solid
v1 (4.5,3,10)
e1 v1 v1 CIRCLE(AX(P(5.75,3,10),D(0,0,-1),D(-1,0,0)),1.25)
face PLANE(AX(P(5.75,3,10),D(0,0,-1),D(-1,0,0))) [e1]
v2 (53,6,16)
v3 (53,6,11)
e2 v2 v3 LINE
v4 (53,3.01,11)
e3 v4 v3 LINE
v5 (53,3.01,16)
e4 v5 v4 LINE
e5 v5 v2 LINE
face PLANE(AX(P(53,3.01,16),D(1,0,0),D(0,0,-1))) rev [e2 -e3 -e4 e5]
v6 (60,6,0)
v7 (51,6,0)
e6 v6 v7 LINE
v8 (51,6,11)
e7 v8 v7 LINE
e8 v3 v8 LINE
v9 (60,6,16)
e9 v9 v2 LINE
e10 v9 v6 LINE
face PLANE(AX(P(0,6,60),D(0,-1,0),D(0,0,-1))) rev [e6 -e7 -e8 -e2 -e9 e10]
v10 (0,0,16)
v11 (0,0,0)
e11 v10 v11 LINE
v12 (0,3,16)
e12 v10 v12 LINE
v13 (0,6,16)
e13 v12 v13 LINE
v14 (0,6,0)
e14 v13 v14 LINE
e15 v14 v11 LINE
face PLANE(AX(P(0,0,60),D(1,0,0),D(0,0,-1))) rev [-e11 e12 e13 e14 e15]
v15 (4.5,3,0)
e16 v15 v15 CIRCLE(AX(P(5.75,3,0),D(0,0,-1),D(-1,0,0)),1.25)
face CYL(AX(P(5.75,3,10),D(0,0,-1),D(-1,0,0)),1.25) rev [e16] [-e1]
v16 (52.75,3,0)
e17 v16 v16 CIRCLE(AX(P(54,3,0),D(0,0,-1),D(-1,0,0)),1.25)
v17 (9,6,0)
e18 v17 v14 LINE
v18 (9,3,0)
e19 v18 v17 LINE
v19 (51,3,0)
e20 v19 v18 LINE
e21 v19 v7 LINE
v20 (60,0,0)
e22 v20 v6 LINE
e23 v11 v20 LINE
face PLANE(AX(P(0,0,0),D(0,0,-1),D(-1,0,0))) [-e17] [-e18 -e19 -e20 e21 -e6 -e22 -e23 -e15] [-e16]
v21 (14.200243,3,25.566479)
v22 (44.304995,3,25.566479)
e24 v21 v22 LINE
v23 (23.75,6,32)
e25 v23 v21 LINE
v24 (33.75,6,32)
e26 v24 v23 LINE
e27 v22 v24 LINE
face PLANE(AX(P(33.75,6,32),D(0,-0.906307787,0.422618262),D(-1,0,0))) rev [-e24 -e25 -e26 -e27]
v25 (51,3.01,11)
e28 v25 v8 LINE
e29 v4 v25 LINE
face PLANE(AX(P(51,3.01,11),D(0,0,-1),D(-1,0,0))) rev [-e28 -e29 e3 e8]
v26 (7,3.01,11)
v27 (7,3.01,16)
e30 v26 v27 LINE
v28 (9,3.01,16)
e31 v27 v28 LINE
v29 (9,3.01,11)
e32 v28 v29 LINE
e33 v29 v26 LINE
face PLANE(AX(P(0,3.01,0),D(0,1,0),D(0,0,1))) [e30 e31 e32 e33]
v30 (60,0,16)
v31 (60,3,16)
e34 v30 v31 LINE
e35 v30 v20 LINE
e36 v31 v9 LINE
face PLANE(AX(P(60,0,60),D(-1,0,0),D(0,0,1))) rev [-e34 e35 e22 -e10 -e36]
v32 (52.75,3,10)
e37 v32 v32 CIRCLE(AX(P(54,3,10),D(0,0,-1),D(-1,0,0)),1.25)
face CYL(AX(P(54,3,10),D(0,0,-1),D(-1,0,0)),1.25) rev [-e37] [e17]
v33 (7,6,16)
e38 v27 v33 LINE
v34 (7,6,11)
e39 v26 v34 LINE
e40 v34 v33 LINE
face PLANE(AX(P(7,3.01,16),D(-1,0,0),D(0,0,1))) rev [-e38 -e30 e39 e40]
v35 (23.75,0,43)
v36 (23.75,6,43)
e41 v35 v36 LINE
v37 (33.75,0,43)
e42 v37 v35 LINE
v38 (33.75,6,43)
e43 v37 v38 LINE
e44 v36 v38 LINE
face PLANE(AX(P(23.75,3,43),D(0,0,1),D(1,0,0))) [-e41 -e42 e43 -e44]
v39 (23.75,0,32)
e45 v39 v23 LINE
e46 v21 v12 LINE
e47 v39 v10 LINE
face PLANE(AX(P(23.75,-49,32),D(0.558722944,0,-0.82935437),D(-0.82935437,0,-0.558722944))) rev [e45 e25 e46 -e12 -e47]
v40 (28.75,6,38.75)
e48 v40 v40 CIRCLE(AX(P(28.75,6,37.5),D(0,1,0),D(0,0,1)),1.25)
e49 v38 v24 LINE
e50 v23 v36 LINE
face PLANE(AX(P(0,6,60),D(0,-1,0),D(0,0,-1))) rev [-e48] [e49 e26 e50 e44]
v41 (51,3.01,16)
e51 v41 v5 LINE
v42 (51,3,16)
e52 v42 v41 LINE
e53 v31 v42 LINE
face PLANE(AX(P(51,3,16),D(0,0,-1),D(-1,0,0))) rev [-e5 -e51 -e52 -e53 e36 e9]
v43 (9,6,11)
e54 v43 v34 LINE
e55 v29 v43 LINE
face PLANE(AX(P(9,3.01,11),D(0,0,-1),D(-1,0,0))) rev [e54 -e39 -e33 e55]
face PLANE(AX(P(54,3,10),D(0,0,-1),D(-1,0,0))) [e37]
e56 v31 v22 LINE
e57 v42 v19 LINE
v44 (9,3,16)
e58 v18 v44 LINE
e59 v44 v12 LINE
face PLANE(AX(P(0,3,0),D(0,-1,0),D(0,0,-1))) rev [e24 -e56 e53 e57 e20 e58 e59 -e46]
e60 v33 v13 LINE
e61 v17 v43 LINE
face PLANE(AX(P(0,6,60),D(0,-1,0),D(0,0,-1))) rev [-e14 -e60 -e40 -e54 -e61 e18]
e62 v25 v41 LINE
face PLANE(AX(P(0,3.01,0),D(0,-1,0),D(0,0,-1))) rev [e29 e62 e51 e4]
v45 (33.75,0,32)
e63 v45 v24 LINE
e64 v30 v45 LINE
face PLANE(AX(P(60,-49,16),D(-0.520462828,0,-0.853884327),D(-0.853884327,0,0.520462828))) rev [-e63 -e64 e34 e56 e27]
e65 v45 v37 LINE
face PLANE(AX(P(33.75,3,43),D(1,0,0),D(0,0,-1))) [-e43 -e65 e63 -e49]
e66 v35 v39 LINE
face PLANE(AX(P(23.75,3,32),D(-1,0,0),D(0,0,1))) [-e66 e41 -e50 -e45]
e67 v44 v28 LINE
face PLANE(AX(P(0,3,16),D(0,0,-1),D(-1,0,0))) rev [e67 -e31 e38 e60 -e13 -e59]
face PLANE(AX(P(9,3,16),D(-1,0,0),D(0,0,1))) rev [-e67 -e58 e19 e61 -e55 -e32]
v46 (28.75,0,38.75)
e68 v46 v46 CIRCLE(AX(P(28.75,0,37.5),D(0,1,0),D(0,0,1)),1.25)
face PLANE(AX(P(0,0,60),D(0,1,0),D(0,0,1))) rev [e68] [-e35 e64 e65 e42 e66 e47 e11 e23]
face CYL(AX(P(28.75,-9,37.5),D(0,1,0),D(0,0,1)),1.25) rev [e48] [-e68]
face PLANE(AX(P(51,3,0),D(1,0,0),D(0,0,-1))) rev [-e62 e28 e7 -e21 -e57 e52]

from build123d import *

# Parameters (mm, degrees)
ESQUISSE1_W              = 60
ESQUISSE1_H              = 6
BOSS_EXTRU_1_DEPTH       = 60
ESQUISSE2_R              = 1.25
ENL_V_MAT_EXTRU_1_DEPTH  = 10
ESQUISSE3_R              = 1.25
ENL_V_MAT_EXTRU_2_DEPTH  = 15
ESQUISSE4_W              = 10
ESQUISSE4_H              = 11
ENL_V_MAT_EXTRU_3_DEPTH  = 3
ENL_V_MAT_EXTRU_4_DEPTH  = 52
CHANFREIN1_SIZE2         = 6.433520762
CHANFREIN1_SIZE          = 3
ESQUISSE6_W              = 2
ESQUISSE6_H              = 5
ENL_V_MAT_EXTRU_16_DEPTH = 2.99


with BuildPart() as part:
    # Esquisse1 → Boss.-Extru.1 (new body)
    with BuildSketch(Plane.XY):
        with Locations((30, 3)):
            Rectangle(ESQUISSE1_W, ESQUISSE1_H)
    extrude(amount=BOSS_EXTRU_1_DEPTH)

    # Esquisse2 → Enlèv. mat.-Extru.1 (cut)
    with BuildSketch(Plane(origin=(0, 0, 0), x_dir=(-1, 0, 0), z_dir=(0, 0, -1))):
        with Locations((-54, 3)):
            Circle(ESQUISSE2_R)
        with Locations((-5.75, 3)):
            Circle(ESQUISSE2_R)
    extrude(amount=-ENL_V_MAT_EXTRU_1_DEPTH, mode=Mode.SUBTRACT)

    # Esquisse3 → Enlèv. mat.-Extru.2 (cut)
    with BuildSketch(Plane(origin=(0, 6, 0), x_dir=(1, 0, 0), z_dir=(0, 1, 0))):
        with Locations(Location((28.75, -37.5, 0), (0, 0, 270))):
            Circle(ESQUISSE3_R)
    extrude(amount=-ENL_V_MAT_EXTRU_2_DEPTH, mode=Mode.SUBTRACT)

    # Esquisse4 → Enlèv. mat.-Extru.3 (cut)
    with BuildSketch(Plane(origin=(0, 6, 0), x_dir=(1, 0, 0), z_dir=(0, 1, 0))):
        Polygon((0, -16), (9, -16), (9, 0), (51, 0), (51, -16), (60, -16), (60, -60), (0, -60), align=None)
        with Locations((28.75, -37.5)):
            Rectangle(ESQUISSE4_W, ESQUISSE4_H, mode=Mode.SUBTRACT)
    extrude(amount=-ENL_V_MAT_EXTRU_3_DEPTH, mode=Mode.SUBTRACT)

    # Esquisse5 → Enlèv. mat.-Extru.4 (cut)
    with BuildSketch(Plane(origin=(0, 3, 0), x_dir=(1, 0, 0), z_dir=(0, 1, 0))):
        Polygon((60, -16), (33.75, -32), (33.75, -43), (23.75, -43), (23.75, -32), (0, -16), (-21.594855386, -85.475485762), (75.414479662, -69.930764824), align=None)
    extrude(amount=-ENL_V_MAT_EXTRU_4_DEPTH, mode=Mode.SUBTRACT)

    # Chanfrein1
    chanfrein1_edges = [part.edges().sort_by_distance(p)[0] for p in [
        (28.75, 3, 32),
    ]]
    chanfrein1_side = [part.faces().sort_by_distance(p)[0] for p in [
        (28.75, 3.06, 32),
    ]]
    chamfer(chanfrein1_edges, length=CHANFREIN1_SIZE - 0.0001, length2=CHANFREIN1_SIZE2 - 0.0001, reference=chanfrein1_side[0])  # a hair under: the kernel refuses the full size

    # Esquisse6 → Enlèv. mat.-Extru.16 (cut)
    with BuildSketch(Plane(origin=(0, 6, 0), x_dir=(1, 0, 0), z_dir=(0, 1, 0))):
        with Locations((52, -13.5)):
            Rectangle(ESQUISSE6_W, ESQUISSE6_H)
        with Locations((8, -13.5)):
            Rectangle(ESQUISSE6_W, ESQUISSE6_H)
    extrude(amount=-ENL_V_MAT_EXTRU_16_DEPTH, mode=Mode.SUBTRACT)


solid = part.part
